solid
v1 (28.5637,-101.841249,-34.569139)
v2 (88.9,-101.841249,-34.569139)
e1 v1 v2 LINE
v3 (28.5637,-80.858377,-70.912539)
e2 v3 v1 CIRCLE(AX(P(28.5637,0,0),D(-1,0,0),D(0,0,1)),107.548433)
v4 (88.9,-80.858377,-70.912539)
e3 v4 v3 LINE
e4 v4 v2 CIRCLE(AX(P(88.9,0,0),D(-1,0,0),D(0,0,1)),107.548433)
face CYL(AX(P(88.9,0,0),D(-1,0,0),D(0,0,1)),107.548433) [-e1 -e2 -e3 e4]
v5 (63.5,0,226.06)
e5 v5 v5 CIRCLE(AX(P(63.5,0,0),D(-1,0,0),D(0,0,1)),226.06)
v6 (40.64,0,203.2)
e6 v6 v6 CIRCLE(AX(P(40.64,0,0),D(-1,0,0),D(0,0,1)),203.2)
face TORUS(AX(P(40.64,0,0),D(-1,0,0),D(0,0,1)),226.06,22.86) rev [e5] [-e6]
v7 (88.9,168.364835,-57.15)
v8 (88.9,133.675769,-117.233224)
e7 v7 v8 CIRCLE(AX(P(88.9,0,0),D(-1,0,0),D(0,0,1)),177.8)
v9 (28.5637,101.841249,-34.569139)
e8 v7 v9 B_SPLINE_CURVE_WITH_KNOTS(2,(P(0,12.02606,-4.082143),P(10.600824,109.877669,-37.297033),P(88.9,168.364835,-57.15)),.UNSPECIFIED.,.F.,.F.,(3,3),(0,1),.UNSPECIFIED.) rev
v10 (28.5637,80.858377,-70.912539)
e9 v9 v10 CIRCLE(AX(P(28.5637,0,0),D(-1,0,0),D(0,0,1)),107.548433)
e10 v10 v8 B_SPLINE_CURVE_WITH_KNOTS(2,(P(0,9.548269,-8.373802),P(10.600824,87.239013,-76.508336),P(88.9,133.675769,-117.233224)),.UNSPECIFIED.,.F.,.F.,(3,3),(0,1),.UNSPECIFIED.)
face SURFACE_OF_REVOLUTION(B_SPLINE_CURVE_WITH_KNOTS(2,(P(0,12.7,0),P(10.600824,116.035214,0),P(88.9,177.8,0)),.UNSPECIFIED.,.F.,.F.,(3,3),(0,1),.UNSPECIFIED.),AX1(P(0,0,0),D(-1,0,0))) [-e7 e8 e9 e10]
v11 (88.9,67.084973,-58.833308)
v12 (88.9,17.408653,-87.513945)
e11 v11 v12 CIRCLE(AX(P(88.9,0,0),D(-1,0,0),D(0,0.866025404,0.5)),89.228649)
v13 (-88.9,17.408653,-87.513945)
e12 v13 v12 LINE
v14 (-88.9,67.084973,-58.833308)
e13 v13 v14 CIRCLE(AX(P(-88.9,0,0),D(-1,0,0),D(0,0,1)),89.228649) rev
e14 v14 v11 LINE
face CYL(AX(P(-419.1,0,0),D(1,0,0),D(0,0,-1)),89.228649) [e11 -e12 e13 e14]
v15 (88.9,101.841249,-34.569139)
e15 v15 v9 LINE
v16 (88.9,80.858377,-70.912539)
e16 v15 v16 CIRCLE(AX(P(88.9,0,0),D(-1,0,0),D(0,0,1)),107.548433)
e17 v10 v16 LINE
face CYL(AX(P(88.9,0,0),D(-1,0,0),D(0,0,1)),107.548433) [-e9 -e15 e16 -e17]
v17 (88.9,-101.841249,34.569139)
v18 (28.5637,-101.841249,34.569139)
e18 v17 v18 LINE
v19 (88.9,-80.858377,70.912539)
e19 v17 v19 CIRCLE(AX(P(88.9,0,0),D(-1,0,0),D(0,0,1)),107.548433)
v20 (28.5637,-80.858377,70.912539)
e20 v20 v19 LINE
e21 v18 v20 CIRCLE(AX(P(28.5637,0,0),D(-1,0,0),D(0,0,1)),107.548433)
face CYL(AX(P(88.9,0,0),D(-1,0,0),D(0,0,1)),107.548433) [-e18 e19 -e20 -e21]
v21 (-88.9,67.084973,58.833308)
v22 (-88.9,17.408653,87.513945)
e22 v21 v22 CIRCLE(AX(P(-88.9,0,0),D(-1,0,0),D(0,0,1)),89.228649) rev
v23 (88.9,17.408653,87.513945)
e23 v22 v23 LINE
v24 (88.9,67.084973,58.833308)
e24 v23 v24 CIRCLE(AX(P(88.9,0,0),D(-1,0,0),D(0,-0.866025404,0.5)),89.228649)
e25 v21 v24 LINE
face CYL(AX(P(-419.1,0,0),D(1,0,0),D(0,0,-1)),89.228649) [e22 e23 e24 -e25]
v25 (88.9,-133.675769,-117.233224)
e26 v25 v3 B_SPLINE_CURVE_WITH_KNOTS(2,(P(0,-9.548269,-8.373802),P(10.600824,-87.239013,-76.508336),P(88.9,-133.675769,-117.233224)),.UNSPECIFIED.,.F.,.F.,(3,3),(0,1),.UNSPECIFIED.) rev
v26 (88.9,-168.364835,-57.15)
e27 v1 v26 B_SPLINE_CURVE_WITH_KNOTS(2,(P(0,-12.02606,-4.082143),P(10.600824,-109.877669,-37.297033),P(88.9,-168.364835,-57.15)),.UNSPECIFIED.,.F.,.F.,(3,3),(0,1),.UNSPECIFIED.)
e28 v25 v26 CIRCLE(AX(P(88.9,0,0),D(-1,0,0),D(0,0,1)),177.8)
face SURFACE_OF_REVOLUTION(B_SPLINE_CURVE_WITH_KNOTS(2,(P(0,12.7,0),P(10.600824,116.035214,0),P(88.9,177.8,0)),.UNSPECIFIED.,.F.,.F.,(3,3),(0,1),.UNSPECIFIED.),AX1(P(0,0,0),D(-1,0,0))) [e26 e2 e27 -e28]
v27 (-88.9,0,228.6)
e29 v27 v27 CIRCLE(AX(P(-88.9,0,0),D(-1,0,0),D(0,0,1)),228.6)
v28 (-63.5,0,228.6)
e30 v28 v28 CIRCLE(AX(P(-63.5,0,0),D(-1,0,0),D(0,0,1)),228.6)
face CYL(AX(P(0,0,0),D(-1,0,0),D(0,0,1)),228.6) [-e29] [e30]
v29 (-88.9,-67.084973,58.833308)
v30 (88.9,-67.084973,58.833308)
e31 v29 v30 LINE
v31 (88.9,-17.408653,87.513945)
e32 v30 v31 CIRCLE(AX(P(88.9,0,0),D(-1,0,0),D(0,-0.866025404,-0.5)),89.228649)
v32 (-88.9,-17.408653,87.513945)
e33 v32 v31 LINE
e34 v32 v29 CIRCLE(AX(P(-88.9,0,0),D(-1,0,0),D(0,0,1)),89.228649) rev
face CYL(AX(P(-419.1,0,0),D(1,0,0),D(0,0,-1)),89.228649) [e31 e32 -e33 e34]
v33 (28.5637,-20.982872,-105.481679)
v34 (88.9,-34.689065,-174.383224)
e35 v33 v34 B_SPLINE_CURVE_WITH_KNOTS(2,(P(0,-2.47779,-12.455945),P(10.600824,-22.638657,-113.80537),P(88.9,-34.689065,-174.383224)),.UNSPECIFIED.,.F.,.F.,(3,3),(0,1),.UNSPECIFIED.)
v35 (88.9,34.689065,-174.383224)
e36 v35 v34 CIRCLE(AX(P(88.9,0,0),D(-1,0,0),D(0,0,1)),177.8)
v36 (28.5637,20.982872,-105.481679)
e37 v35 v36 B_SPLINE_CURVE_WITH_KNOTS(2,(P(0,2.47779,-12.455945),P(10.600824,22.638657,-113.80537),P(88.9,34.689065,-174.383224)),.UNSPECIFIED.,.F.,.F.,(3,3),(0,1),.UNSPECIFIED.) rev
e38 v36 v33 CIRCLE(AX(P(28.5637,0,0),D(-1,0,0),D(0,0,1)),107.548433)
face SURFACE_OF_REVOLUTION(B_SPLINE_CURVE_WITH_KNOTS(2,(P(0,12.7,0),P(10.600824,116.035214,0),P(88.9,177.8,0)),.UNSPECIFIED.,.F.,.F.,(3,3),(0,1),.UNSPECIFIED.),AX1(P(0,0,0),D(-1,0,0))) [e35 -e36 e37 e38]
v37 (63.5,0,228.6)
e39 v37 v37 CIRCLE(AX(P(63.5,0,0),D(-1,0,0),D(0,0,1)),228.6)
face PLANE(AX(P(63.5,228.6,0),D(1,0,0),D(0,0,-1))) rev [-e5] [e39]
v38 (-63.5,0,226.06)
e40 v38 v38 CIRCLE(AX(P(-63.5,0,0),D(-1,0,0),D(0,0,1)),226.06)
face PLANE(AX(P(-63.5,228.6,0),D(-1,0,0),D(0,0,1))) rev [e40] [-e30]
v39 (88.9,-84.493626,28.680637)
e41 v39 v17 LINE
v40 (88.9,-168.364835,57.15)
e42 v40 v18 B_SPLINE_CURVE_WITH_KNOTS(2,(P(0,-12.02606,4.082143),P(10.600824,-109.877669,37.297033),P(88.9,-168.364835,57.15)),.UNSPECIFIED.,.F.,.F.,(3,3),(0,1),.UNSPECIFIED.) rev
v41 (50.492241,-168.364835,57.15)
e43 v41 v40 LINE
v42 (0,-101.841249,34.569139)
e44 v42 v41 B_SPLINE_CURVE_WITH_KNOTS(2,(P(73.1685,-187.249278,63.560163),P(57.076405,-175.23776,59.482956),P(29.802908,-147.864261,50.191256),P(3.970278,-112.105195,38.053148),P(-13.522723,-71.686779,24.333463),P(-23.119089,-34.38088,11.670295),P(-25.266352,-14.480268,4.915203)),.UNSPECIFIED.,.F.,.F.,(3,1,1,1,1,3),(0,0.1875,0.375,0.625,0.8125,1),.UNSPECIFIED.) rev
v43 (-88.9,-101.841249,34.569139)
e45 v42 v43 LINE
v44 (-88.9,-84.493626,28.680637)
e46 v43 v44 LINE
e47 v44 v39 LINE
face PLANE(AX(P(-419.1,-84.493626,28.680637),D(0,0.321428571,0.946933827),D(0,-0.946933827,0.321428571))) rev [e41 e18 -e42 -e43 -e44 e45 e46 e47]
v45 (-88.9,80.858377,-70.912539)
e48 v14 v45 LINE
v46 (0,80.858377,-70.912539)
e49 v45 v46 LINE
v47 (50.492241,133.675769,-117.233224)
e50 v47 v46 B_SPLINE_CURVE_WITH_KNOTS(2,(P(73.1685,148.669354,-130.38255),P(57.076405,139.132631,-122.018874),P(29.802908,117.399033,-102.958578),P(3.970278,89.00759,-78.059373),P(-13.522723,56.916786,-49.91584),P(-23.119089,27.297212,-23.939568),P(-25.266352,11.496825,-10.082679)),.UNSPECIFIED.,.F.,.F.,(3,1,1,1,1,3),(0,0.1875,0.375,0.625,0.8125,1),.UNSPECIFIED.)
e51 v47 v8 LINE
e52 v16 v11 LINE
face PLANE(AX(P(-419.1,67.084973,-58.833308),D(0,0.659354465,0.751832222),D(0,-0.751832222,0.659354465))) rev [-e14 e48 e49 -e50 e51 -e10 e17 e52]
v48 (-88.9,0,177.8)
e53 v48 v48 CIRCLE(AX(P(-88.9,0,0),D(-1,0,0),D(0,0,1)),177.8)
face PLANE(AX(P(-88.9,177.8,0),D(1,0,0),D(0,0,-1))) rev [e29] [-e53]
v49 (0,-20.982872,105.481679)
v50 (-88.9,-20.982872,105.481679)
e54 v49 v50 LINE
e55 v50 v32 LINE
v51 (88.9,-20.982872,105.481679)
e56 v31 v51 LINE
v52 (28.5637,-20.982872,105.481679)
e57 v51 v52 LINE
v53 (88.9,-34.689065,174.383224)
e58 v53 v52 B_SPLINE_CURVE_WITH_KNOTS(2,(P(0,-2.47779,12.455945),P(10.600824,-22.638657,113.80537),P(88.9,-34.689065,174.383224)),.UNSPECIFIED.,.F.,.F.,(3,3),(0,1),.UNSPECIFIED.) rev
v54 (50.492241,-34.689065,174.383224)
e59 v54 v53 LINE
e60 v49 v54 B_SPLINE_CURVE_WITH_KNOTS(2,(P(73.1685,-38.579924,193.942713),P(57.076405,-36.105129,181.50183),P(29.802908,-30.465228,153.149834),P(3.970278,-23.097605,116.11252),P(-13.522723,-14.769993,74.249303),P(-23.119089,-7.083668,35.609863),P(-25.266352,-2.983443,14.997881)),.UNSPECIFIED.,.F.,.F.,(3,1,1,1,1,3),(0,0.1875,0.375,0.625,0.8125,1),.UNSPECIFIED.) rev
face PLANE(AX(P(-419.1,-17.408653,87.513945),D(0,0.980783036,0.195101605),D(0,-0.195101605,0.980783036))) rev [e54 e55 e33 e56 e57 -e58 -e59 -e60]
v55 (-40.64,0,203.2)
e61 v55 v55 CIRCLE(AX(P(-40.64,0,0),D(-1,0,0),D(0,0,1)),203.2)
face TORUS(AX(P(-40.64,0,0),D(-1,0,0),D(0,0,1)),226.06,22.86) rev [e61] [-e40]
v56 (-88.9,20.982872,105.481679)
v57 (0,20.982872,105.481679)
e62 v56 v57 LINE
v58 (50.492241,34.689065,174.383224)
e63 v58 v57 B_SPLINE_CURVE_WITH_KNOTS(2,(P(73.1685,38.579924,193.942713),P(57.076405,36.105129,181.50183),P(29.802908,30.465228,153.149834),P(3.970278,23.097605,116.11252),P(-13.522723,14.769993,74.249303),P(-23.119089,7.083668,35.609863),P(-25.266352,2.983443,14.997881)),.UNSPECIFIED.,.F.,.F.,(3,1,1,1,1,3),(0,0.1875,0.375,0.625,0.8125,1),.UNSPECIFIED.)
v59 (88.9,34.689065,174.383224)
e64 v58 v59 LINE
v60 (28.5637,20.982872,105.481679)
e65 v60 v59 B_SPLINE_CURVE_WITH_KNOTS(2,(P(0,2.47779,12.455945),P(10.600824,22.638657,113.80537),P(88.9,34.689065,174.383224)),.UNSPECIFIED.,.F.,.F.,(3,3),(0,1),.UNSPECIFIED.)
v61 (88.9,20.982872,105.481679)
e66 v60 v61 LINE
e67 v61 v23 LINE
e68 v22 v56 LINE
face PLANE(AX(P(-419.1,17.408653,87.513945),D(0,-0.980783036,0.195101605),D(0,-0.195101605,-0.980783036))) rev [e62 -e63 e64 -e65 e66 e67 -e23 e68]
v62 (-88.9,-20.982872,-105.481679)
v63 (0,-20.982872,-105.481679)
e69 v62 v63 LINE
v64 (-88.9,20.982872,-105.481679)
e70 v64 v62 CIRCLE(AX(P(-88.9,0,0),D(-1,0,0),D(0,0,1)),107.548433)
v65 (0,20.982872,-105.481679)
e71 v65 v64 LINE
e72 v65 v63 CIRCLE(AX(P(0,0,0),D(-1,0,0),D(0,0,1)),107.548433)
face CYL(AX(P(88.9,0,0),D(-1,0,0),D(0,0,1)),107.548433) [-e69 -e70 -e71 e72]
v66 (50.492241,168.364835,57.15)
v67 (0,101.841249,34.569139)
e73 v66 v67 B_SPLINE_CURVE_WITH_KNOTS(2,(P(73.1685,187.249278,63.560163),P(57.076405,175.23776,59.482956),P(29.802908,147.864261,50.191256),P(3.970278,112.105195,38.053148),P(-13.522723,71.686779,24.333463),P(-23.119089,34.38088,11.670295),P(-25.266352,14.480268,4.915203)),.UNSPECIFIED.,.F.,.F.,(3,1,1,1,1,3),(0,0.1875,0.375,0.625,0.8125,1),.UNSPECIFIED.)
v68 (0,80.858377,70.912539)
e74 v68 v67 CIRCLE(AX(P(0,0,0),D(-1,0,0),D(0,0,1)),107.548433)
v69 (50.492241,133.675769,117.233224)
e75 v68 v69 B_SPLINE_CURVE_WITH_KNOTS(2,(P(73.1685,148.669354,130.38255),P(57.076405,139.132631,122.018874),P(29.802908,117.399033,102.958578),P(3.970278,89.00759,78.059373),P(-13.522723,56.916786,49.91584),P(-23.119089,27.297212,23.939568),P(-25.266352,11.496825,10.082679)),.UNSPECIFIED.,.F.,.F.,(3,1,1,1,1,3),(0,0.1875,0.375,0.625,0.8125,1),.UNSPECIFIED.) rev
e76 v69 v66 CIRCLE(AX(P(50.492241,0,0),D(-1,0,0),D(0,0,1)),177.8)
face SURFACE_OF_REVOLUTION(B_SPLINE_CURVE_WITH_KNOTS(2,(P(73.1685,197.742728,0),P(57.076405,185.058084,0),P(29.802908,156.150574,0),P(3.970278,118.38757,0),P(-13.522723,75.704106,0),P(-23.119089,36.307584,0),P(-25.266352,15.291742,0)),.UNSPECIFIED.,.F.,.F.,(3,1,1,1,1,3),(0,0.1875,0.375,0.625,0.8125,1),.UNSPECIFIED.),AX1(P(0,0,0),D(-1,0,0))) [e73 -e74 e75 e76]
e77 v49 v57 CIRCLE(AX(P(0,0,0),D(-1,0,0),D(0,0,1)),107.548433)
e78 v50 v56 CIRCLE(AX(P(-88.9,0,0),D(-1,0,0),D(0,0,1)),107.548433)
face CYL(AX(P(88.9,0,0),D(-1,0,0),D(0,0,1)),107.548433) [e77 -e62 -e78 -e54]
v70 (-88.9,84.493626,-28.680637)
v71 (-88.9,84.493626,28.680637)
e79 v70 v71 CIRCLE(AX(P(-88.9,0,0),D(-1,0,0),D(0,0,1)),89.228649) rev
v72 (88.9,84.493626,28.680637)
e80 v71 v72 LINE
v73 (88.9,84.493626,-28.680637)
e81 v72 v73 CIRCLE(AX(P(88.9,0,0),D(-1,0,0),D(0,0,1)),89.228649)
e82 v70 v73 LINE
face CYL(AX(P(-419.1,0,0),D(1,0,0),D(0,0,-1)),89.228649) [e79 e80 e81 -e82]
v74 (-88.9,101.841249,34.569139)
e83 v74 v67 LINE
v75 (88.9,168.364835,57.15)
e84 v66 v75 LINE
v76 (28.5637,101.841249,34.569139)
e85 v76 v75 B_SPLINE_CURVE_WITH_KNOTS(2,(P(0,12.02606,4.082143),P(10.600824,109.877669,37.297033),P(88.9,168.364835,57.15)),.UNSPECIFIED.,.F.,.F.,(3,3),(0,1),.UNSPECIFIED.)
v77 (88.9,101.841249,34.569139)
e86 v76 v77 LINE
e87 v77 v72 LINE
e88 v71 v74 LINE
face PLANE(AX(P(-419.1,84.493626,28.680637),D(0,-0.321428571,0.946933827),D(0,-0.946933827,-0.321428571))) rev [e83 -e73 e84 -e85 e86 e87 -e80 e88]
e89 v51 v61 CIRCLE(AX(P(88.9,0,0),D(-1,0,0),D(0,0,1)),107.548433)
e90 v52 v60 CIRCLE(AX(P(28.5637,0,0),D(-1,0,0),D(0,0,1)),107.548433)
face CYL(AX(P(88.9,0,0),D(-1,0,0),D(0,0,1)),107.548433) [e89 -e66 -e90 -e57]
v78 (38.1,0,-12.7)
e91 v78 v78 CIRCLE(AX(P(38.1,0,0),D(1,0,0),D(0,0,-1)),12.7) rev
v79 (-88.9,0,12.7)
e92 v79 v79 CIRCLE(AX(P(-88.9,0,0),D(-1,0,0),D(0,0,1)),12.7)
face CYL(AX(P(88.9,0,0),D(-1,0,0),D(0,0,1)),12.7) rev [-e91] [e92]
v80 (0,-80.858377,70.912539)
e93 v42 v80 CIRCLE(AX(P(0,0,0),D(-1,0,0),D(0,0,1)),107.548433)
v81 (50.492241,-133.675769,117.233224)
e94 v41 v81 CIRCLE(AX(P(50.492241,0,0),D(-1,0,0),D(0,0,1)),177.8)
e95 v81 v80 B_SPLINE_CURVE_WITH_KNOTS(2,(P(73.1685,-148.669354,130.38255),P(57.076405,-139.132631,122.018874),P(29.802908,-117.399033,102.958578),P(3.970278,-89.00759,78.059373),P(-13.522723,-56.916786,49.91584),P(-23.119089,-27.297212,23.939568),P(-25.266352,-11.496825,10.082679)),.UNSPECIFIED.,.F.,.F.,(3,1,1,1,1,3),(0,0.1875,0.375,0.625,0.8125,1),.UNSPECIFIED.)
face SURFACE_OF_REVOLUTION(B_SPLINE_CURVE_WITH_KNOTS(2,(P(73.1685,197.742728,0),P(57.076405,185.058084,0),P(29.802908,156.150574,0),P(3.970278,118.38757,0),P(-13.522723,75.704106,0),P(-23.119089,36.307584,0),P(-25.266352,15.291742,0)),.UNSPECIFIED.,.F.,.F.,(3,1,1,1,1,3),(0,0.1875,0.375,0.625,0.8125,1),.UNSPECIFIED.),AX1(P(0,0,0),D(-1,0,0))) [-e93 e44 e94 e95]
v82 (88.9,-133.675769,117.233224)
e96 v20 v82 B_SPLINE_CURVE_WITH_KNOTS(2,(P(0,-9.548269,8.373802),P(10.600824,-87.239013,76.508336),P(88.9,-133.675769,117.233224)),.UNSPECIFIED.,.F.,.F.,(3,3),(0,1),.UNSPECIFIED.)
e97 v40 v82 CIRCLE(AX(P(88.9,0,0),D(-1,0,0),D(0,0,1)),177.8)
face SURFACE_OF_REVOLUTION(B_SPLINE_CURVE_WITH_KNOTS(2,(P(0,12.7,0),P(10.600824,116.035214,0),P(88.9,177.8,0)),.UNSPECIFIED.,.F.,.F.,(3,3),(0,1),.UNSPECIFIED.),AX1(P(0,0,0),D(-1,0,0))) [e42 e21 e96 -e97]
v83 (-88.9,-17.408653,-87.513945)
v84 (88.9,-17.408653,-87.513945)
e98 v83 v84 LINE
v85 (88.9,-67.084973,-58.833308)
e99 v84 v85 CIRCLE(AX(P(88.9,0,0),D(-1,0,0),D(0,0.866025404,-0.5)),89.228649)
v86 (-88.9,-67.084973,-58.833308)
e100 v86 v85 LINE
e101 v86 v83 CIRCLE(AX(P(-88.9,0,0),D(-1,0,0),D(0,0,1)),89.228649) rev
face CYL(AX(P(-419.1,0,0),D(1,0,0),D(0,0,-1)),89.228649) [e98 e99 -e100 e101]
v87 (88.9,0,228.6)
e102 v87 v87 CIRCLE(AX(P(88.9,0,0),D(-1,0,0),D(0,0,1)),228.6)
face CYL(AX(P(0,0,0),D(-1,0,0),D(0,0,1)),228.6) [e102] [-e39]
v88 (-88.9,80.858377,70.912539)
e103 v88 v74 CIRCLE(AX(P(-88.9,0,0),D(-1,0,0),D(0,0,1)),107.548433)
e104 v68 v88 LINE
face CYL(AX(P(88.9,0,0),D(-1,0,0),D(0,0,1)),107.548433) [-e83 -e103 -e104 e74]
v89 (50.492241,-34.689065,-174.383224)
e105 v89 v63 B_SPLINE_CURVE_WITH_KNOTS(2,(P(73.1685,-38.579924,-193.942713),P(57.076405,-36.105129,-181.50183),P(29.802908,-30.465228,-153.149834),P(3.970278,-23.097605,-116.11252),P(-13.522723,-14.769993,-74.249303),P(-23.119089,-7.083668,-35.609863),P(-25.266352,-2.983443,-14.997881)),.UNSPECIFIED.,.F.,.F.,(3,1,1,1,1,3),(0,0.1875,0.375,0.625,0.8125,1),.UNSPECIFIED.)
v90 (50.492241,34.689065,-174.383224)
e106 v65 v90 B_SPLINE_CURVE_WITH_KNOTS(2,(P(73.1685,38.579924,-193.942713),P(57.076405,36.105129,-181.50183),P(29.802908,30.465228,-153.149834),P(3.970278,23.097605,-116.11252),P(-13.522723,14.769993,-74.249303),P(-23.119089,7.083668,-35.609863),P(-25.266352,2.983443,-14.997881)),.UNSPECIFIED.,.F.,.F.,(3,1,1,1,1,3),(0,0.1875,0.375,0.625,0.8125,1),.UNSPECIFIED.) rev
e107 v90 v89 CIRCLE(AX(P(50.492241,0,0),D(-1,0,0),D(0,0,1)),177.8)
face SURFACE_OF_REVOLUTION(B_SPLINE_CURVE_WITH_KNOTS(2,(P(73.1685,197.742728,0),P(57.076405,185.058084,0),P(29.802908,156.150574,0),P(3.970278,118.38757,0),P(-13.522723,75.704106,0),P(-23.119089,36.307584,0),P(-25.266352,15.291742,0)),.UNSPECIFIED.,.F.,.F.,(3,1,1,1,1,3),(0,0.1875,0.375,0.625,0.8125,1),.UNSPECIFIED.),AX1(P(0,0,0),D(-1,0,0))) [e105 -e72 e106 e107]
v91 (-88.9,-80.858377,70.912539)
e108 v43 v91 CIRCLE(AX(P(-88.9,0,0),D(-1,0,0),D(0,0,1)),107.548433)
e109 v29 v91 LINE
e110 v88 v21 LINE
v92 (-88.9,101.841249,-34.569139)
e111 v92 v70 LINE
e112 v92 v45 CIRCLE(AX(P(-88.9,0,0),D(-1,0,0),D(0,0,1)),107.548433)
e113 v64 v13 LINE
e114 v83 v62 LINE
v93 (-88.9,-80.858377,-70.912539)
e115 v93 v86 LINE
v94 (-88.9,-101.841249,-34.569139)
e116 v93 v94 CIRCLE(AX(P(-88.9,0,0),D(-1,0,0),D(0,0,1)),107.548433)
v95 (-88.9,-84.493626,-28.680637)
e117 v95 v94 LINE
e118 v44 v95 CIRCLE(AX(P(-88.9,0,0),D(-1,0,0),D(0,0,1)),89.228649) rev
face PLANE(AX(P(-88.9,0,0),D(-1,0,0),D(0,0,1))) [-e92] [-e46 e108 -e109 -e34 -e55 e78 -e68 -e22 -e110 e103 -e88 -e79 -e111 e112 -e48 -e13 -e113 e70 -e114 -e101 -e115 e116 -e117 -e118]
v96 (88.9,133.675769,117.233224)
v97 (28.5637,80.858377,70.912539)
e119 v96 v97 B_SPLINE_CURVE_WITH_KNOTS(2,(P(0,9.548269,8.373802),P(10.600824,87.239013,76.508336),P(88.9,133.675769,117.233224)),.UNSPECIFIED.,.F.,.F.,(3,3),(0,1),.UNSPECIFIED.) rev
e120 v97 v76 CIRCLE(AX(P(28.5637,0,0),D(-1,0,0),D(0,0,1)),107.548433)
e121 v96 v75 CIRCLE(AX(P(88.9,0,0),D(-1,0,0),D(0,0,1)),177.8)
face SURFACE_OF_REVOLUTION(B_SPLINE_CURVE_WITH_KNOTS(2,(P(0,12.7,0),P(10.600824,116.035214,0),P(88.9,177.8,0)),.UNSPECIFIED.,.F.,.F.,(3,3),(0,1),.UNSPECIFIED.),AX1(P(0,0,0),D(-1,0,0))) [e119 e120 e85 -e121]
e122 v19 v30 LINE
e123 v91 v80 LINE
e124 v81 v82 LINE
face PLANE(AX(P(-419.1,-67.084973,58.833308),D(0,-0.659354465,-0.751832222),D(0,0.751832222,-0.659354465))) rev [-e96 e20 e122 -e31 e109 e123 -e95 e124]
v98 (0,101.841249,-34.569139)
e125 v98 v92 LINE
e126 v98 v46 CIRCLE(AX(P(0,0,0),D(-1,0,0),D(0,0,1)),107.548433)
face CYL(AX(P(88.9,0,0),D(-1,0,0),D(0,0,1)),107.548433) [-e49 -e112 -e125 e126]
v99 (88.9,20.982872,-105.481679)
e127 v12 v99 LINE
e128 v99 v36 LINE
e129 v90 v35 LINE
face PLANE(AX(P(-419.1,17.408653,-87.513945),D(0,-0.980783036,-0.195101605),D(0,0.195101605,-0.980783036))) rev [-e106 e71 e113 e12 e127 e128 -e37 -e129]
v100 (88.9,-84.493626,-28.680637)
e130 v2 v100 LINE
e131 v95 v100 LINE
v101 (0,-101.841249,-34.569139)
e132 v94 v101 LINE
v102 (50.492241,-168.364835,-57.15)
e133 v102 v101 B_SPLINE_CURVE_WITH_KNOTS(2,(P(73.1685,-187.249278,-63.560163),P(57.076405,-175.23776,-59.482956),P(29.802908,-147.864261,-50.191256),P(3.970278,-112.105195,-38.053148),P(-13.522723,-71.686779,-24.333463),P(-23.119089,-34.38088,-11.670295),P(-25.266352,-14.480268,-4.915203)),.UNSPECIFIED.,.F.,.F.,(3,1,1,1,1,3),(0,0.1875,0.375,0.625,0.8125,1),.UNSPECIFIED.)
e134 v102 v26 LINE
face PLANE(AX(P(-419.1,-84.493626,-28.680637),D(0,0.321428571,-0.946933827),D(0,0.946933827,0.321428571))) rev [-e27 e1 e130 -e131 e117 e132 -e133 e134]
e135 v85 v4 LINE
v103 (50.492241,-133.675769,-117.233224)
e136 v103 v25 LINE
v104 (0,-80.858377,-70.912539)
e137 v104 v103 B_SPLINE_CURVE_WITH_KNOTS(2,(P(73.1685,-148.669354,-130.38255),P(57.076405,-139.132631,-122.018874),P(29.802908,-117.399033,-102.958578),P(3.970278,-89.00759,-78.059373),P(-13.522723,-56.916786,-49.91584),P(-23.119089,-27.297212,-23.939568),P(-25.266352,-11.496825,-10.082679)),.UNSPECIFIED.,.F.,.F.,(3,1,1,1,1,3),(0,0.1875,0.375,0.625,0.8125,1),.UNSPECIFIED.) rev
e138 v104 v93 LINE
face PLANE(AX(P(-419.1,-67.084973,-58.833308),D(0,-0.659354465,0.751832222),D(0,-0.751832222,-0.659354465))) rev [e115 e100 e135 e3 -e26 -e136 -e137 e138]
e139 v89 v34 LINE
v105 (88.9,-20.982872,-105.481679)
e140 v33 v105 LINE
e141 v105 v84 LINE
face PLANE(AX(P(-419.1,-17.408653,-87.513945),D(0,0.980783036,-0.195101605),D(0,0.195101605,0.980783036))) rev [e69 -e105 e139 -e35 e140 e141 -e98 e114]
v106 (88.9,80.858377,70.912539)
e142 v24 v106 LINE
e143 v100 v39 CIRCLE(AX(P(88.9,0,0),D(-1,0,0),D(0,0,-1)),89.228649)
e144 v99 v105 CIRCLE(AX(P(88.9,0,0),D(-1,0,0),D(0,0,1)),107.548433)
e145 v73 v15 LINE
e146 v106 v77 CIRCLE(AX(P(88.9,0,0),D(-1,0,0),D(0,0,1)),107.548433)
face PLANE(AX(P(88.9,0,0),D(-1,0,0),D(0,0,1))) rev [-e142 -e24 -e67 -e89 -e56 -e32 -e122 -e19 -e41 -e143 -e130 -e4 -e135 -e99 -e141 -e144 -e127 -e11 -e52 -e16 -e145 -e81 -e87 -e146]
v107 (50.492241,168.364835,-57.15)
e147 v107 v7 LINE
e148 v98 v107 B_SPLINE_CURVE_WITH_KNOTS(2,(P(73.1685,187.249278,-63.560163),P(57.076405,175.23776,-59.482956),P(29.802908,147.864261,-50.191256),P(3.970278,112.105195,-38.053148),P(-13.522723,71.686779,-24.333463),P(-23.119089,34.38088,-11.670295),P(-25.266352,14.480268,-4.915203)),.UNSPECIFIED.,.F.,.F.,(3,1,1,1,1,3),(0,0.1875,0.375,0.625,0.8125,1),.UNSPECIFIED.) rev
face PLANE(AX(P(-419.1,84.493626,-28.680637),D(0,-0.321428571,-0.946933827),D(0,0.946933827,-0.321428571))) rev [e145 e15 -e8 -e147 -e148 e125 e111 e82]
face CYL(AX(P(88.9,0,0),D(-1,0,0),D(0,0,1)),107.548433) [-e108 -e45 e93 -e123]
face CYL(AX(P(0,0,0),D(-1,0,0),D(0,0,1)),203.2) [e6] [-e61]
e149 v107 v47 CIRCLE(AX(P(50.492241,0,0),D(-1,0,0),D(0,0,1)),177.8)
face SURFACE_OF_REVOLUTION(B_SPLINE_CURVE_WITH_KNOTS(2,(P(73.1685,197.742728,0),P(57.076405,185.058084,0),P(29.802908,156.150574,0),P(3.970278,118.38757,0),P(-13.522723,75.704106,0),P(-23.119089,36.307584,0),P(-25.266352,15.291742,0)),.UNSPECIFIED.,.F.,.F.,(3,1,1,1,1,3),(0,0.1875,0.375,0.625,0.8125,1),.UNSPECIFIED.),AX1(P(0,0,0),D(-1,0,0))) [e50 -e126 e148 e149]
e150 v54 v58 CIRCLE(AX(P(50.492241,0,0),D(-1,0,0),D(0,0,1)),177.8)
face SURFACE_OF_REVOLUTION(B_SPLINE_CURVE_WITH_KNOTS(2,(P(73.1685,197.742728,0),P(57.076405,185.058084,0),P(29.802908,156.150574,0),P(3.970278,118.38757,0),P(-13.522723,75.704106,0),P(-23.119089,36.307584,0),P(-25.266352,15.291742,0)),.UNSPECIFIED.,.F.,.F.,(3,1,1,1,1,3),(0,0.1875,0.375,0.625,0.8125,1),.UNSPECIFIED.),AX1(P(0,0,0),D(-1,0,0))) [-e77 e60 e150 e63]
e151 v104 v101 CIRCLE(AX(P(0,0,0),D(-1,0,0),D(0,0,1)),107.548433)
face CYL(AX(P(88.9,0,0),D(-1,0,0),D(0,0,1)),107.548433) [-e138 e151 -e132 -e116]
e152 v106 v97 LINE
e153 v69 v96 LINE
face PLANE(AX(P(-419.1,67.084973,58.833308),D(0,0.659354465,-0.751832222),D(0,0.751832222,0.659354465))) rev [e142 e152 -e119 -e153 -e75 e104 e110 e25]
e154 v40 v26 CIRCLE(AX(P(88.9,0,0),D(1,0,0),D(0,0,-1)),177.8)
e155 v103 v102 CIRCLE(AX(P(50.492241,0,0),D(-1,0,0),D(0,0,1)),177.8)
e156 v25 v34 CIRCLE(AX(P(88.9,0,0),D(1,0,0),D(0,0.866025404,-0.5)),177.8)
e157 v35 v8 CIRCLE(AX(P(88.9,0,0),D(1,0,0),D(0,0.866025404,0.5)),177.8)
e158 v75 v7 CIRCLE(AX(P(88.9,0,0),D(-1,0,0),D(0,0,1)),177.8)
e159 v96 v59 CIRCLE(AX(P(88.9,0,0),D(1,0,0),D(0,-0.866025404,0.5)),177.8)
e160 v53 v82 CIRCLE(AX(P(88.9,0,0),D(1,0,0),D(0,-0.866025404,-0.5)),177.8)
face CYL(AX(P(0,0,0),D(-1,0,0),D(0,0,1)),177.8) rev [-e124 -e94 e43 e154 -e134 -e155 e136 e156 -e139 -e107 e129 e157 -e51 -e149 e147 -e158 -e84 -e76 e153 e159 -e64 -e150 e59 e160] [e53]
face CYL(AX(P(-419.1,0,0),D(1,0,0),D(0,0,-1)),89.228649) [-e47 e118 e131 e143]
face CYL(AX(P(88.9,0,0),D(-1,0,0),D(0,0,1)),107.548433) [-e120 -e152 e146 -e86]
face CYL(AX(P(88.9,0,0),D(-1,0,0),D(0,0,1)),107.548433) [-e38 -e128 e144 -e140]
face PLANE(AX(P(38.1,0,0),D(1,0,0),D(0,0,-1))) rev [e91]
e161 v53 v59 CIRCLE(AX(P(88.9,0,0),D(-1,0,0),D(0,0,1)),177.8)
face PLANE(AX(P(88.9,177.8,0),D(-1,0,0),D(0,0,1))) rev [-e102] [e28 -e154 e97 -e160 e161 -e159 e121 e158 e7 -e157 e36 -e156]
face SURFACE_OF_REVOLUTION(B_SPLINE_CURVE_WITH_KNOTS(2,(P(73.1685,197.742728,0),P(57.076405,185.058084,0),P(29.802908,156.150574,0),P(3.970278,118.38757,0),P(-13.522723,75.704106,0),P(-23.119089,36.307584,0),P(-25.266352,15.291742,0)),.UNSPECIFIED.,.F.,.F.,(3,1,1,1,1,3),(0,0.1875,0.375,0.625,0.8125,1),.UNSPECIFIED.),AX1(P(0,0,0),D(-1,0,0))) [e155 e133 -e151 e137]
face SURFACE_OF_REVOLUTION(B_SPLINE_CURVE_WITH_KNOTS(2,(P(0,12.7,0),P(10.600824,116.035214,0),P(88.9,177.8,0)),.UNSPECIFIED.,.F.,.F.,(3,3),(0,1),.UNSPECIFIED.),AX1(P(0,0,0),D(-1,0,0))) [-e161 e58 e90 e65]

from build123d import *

# Parameters (mm, degrees)
REVOLVE2_OUTLINE_W  = 25.39999999999995
REVOLVE2_OUTLINE_H  = 38.407758663
SKETCH3_R           = 107.54843304644665
SKETCH3_R_2         = 12.700000000000003
BOSS_EXTRUDE1_DEPTH = 177.79999999999998
BOSS_EXTRUDE2_START = -50.8
SKETCH4_R           = 107.54843304644665
BOSS_EXTRUDE2_DEPTH = 50.8
CUT_EXTRUDE1_START  = -508
CUT_EXTRUDE1_DEPTH  = 508
CIRPATTERN1_COUNT   = 6


# Read off the part's stored shape, not the designer's step: Revolve2
with BuildPart() as part:
    # Revolve2 outline → Revolve2 (revolve)
    with BuildSketch(Plane.YX):
        with BuildLine():
            add(Edge.make_bspline(
                [(12.7, 0), (65.56394076942757, 5.423140195743021), (107.548433046, 28.563700108)],
                knots=[0, 0, 0, 0.5115772122825497, 0.5115772122825497, 0.5115772122825497], degree=2))
            Line((12.7, 0), (107.548433046, 0))
            Line((107.548433046, 0), (107.548433046, 28.563700108))
        make_face()
        with BuildLine():
            add(Edge.make_bspline(
                [(107.548433046, 28.563700108), (124.74480096527253, 38.04180882229545), (140.116002229, 50.492241337)],
                knots=[0.5115772122825497, 0.5115772122825497, 0.5115772122825497, 0.7211133882490103, 0.7211133882490103, 0.7211133882490103], degree=2))
            Line((107.548433046, 28.563700108), (107.548433046, 0))
            add(Edge.make_bspline(
                [(177.8, 50.492241337), (174.25870908441857, 46.88747078495737), (156.1505738072, 29.8029081407884), (124.48137705008449, 8.138883125204057), (107.548433046, 0)],
                knots=[0.1400938920026617, 0.1400938920026617, 0.1400938920026617, 0.1875, 0.375, 0.5544007278163002, 0.5544007278163002, 0.5544007278163002], degree=2))
            Line((177.8, 50.492241337), (140.116002229, 50.492241337))
        make_face()
        with BuildLine():
            add(Edge.make_bspline(
                [(140.116002229, 50.492241337), (160.57462814001852, 67.06340821472577), (177.8, 88.9)],
                knots=[0.7211133882490103, 0.7211133882490103, 0.7211133882490103, 1, 1, 1], degree=2))
            Line((140.116002229, 50.492241337), (177.8, 50.492241337))
            Line((177.8, 50.492241337), (177.8, 88.9))
        make_face()
        Polygon((203.2, 50.492241337), (177.8, 50.492241337), (177.8, 0), (203.2, 0), (203.2, 40.64), align=None)
        with Locations((190.5, 69.6961206685)):
            Rectangle(REVOLVE2_OUTLINE_W, REVOLVE2_OUTLINE_H)
        Polygon((203.2, 0), (177.8, 0), (177.8, -88.9), (203.2, -88.9), (203.2, -40.64), align=None)
        with BuildLine():
            Line((205.432034985, 50.492241337), (203.2, 50.492241337))
            Line((203.2, 50.492241337), (203.2, 40.64))
            ThreePointArc((203.2, 40.64), (203.76499069, 45.690956334), (205.432034985, 50.492241337))
        make_face()
        with BuildLine():
            Line((203.2, 88.9), (203.2, 50.492241337))
            Line((203.2, 50.492241337), (205.432034985, 50.492241337))
            ThreePointArc((205.432034985, 50.492241337), (213.866613206, 59.976517745), (226.06, 63.5))
            Line((226.06, 63.5), (228.6, 63.5))
            Line((228.6, 63.5), (228.6, 88.9))
            Line((228.6, 88.9), (203.2, 88.9))
        make_face()
        with BuildLine():
            Line((203.2, -40.64), (203.2, -88.9))
            Line((203.2, -88.9), (228.6, -88.9))
            Line((228.6, -88.9), (228.6, -63.5))
            Line((228.6, -63.5), (226.06, -63.5))
            ThreePointArc((226.06, -63.5), (209.895538982, -56.804461018), (203.2, -40.64))
        make_face()
    revolve(axis=Axis((0, 0, 0), (1, 0, 0)))

    # Sketch3 → Boss-Extrude1 (add)
    with BuildSketch(Plane.ZY.offset(88.89999999999999)):
        Circle(SKETCH3_R)
        Circle(SKETCH3_R_2, mode=Mode.SUBTRACT)
    extrude(amount=-BOSS_EXTRUDE1_DEPTH)

    # Sketch4 → Boss-Extrude2 (add)
    with BuildSketch(Plane(origin=(88.89999999999999, 0, 0), x_dir=(0, 0, -1), z_dir=(1, 0, 0)).offset(BOSS_EXTRUDE2_START)):
        with Locations(Location((0, 0, 0), (0, 0, 180))):
            Circle(SKETCH4_R)
    extrude(amount=BOSS_EXTRUDE2_DEPTH)

    # Sketch5 → Cut-Extrude1 (cut)
    with BuildSketch(Plane(origin=(88.89999999999999, 0, 0), x_dir=(0, 0, -1), z_dir=(1, 0, 0)).offset(CUT_EXTRUDE1_START)):
        with BuildLine():
            Line((-28.680637108892512, 84.49362590578919), (-57.15, 168.36483451124818))
            ThreePointArc((-57.15, 168.36483451124818), (1.089e-14, 177.79999999999995), (57.15, 168.36483451124818))
            Line((57.15, 168.36483451124818), (28.680637108892512, 84.49362590578919))
            ThreePointArc((28.680637108892512, 84.49362590578919), (5.46e-15, 89.22864878322115), (-28.680637108892512, 84.49362590578919))
        make_face()
    cut_extrude1 = extrude(amount=CUT_EXTRUDE1_DEPTH, mode=Mode.SUBTRACT)

    # CirPattern1: Cut-Extrude1 ×6 about axis
    cirpattern1_axis = Axis((0, 2.4e-16, 1.8e-16), (1, 0, 0))
    for i in range(1, CIRPATTERN1_COUNT):
        add(cut_extrude1.rotate(cirpattern1_axis, i * 360 / CIRPATTERN1_COUNT), mode=Mode.SUBTRACT)


solid = part.part
